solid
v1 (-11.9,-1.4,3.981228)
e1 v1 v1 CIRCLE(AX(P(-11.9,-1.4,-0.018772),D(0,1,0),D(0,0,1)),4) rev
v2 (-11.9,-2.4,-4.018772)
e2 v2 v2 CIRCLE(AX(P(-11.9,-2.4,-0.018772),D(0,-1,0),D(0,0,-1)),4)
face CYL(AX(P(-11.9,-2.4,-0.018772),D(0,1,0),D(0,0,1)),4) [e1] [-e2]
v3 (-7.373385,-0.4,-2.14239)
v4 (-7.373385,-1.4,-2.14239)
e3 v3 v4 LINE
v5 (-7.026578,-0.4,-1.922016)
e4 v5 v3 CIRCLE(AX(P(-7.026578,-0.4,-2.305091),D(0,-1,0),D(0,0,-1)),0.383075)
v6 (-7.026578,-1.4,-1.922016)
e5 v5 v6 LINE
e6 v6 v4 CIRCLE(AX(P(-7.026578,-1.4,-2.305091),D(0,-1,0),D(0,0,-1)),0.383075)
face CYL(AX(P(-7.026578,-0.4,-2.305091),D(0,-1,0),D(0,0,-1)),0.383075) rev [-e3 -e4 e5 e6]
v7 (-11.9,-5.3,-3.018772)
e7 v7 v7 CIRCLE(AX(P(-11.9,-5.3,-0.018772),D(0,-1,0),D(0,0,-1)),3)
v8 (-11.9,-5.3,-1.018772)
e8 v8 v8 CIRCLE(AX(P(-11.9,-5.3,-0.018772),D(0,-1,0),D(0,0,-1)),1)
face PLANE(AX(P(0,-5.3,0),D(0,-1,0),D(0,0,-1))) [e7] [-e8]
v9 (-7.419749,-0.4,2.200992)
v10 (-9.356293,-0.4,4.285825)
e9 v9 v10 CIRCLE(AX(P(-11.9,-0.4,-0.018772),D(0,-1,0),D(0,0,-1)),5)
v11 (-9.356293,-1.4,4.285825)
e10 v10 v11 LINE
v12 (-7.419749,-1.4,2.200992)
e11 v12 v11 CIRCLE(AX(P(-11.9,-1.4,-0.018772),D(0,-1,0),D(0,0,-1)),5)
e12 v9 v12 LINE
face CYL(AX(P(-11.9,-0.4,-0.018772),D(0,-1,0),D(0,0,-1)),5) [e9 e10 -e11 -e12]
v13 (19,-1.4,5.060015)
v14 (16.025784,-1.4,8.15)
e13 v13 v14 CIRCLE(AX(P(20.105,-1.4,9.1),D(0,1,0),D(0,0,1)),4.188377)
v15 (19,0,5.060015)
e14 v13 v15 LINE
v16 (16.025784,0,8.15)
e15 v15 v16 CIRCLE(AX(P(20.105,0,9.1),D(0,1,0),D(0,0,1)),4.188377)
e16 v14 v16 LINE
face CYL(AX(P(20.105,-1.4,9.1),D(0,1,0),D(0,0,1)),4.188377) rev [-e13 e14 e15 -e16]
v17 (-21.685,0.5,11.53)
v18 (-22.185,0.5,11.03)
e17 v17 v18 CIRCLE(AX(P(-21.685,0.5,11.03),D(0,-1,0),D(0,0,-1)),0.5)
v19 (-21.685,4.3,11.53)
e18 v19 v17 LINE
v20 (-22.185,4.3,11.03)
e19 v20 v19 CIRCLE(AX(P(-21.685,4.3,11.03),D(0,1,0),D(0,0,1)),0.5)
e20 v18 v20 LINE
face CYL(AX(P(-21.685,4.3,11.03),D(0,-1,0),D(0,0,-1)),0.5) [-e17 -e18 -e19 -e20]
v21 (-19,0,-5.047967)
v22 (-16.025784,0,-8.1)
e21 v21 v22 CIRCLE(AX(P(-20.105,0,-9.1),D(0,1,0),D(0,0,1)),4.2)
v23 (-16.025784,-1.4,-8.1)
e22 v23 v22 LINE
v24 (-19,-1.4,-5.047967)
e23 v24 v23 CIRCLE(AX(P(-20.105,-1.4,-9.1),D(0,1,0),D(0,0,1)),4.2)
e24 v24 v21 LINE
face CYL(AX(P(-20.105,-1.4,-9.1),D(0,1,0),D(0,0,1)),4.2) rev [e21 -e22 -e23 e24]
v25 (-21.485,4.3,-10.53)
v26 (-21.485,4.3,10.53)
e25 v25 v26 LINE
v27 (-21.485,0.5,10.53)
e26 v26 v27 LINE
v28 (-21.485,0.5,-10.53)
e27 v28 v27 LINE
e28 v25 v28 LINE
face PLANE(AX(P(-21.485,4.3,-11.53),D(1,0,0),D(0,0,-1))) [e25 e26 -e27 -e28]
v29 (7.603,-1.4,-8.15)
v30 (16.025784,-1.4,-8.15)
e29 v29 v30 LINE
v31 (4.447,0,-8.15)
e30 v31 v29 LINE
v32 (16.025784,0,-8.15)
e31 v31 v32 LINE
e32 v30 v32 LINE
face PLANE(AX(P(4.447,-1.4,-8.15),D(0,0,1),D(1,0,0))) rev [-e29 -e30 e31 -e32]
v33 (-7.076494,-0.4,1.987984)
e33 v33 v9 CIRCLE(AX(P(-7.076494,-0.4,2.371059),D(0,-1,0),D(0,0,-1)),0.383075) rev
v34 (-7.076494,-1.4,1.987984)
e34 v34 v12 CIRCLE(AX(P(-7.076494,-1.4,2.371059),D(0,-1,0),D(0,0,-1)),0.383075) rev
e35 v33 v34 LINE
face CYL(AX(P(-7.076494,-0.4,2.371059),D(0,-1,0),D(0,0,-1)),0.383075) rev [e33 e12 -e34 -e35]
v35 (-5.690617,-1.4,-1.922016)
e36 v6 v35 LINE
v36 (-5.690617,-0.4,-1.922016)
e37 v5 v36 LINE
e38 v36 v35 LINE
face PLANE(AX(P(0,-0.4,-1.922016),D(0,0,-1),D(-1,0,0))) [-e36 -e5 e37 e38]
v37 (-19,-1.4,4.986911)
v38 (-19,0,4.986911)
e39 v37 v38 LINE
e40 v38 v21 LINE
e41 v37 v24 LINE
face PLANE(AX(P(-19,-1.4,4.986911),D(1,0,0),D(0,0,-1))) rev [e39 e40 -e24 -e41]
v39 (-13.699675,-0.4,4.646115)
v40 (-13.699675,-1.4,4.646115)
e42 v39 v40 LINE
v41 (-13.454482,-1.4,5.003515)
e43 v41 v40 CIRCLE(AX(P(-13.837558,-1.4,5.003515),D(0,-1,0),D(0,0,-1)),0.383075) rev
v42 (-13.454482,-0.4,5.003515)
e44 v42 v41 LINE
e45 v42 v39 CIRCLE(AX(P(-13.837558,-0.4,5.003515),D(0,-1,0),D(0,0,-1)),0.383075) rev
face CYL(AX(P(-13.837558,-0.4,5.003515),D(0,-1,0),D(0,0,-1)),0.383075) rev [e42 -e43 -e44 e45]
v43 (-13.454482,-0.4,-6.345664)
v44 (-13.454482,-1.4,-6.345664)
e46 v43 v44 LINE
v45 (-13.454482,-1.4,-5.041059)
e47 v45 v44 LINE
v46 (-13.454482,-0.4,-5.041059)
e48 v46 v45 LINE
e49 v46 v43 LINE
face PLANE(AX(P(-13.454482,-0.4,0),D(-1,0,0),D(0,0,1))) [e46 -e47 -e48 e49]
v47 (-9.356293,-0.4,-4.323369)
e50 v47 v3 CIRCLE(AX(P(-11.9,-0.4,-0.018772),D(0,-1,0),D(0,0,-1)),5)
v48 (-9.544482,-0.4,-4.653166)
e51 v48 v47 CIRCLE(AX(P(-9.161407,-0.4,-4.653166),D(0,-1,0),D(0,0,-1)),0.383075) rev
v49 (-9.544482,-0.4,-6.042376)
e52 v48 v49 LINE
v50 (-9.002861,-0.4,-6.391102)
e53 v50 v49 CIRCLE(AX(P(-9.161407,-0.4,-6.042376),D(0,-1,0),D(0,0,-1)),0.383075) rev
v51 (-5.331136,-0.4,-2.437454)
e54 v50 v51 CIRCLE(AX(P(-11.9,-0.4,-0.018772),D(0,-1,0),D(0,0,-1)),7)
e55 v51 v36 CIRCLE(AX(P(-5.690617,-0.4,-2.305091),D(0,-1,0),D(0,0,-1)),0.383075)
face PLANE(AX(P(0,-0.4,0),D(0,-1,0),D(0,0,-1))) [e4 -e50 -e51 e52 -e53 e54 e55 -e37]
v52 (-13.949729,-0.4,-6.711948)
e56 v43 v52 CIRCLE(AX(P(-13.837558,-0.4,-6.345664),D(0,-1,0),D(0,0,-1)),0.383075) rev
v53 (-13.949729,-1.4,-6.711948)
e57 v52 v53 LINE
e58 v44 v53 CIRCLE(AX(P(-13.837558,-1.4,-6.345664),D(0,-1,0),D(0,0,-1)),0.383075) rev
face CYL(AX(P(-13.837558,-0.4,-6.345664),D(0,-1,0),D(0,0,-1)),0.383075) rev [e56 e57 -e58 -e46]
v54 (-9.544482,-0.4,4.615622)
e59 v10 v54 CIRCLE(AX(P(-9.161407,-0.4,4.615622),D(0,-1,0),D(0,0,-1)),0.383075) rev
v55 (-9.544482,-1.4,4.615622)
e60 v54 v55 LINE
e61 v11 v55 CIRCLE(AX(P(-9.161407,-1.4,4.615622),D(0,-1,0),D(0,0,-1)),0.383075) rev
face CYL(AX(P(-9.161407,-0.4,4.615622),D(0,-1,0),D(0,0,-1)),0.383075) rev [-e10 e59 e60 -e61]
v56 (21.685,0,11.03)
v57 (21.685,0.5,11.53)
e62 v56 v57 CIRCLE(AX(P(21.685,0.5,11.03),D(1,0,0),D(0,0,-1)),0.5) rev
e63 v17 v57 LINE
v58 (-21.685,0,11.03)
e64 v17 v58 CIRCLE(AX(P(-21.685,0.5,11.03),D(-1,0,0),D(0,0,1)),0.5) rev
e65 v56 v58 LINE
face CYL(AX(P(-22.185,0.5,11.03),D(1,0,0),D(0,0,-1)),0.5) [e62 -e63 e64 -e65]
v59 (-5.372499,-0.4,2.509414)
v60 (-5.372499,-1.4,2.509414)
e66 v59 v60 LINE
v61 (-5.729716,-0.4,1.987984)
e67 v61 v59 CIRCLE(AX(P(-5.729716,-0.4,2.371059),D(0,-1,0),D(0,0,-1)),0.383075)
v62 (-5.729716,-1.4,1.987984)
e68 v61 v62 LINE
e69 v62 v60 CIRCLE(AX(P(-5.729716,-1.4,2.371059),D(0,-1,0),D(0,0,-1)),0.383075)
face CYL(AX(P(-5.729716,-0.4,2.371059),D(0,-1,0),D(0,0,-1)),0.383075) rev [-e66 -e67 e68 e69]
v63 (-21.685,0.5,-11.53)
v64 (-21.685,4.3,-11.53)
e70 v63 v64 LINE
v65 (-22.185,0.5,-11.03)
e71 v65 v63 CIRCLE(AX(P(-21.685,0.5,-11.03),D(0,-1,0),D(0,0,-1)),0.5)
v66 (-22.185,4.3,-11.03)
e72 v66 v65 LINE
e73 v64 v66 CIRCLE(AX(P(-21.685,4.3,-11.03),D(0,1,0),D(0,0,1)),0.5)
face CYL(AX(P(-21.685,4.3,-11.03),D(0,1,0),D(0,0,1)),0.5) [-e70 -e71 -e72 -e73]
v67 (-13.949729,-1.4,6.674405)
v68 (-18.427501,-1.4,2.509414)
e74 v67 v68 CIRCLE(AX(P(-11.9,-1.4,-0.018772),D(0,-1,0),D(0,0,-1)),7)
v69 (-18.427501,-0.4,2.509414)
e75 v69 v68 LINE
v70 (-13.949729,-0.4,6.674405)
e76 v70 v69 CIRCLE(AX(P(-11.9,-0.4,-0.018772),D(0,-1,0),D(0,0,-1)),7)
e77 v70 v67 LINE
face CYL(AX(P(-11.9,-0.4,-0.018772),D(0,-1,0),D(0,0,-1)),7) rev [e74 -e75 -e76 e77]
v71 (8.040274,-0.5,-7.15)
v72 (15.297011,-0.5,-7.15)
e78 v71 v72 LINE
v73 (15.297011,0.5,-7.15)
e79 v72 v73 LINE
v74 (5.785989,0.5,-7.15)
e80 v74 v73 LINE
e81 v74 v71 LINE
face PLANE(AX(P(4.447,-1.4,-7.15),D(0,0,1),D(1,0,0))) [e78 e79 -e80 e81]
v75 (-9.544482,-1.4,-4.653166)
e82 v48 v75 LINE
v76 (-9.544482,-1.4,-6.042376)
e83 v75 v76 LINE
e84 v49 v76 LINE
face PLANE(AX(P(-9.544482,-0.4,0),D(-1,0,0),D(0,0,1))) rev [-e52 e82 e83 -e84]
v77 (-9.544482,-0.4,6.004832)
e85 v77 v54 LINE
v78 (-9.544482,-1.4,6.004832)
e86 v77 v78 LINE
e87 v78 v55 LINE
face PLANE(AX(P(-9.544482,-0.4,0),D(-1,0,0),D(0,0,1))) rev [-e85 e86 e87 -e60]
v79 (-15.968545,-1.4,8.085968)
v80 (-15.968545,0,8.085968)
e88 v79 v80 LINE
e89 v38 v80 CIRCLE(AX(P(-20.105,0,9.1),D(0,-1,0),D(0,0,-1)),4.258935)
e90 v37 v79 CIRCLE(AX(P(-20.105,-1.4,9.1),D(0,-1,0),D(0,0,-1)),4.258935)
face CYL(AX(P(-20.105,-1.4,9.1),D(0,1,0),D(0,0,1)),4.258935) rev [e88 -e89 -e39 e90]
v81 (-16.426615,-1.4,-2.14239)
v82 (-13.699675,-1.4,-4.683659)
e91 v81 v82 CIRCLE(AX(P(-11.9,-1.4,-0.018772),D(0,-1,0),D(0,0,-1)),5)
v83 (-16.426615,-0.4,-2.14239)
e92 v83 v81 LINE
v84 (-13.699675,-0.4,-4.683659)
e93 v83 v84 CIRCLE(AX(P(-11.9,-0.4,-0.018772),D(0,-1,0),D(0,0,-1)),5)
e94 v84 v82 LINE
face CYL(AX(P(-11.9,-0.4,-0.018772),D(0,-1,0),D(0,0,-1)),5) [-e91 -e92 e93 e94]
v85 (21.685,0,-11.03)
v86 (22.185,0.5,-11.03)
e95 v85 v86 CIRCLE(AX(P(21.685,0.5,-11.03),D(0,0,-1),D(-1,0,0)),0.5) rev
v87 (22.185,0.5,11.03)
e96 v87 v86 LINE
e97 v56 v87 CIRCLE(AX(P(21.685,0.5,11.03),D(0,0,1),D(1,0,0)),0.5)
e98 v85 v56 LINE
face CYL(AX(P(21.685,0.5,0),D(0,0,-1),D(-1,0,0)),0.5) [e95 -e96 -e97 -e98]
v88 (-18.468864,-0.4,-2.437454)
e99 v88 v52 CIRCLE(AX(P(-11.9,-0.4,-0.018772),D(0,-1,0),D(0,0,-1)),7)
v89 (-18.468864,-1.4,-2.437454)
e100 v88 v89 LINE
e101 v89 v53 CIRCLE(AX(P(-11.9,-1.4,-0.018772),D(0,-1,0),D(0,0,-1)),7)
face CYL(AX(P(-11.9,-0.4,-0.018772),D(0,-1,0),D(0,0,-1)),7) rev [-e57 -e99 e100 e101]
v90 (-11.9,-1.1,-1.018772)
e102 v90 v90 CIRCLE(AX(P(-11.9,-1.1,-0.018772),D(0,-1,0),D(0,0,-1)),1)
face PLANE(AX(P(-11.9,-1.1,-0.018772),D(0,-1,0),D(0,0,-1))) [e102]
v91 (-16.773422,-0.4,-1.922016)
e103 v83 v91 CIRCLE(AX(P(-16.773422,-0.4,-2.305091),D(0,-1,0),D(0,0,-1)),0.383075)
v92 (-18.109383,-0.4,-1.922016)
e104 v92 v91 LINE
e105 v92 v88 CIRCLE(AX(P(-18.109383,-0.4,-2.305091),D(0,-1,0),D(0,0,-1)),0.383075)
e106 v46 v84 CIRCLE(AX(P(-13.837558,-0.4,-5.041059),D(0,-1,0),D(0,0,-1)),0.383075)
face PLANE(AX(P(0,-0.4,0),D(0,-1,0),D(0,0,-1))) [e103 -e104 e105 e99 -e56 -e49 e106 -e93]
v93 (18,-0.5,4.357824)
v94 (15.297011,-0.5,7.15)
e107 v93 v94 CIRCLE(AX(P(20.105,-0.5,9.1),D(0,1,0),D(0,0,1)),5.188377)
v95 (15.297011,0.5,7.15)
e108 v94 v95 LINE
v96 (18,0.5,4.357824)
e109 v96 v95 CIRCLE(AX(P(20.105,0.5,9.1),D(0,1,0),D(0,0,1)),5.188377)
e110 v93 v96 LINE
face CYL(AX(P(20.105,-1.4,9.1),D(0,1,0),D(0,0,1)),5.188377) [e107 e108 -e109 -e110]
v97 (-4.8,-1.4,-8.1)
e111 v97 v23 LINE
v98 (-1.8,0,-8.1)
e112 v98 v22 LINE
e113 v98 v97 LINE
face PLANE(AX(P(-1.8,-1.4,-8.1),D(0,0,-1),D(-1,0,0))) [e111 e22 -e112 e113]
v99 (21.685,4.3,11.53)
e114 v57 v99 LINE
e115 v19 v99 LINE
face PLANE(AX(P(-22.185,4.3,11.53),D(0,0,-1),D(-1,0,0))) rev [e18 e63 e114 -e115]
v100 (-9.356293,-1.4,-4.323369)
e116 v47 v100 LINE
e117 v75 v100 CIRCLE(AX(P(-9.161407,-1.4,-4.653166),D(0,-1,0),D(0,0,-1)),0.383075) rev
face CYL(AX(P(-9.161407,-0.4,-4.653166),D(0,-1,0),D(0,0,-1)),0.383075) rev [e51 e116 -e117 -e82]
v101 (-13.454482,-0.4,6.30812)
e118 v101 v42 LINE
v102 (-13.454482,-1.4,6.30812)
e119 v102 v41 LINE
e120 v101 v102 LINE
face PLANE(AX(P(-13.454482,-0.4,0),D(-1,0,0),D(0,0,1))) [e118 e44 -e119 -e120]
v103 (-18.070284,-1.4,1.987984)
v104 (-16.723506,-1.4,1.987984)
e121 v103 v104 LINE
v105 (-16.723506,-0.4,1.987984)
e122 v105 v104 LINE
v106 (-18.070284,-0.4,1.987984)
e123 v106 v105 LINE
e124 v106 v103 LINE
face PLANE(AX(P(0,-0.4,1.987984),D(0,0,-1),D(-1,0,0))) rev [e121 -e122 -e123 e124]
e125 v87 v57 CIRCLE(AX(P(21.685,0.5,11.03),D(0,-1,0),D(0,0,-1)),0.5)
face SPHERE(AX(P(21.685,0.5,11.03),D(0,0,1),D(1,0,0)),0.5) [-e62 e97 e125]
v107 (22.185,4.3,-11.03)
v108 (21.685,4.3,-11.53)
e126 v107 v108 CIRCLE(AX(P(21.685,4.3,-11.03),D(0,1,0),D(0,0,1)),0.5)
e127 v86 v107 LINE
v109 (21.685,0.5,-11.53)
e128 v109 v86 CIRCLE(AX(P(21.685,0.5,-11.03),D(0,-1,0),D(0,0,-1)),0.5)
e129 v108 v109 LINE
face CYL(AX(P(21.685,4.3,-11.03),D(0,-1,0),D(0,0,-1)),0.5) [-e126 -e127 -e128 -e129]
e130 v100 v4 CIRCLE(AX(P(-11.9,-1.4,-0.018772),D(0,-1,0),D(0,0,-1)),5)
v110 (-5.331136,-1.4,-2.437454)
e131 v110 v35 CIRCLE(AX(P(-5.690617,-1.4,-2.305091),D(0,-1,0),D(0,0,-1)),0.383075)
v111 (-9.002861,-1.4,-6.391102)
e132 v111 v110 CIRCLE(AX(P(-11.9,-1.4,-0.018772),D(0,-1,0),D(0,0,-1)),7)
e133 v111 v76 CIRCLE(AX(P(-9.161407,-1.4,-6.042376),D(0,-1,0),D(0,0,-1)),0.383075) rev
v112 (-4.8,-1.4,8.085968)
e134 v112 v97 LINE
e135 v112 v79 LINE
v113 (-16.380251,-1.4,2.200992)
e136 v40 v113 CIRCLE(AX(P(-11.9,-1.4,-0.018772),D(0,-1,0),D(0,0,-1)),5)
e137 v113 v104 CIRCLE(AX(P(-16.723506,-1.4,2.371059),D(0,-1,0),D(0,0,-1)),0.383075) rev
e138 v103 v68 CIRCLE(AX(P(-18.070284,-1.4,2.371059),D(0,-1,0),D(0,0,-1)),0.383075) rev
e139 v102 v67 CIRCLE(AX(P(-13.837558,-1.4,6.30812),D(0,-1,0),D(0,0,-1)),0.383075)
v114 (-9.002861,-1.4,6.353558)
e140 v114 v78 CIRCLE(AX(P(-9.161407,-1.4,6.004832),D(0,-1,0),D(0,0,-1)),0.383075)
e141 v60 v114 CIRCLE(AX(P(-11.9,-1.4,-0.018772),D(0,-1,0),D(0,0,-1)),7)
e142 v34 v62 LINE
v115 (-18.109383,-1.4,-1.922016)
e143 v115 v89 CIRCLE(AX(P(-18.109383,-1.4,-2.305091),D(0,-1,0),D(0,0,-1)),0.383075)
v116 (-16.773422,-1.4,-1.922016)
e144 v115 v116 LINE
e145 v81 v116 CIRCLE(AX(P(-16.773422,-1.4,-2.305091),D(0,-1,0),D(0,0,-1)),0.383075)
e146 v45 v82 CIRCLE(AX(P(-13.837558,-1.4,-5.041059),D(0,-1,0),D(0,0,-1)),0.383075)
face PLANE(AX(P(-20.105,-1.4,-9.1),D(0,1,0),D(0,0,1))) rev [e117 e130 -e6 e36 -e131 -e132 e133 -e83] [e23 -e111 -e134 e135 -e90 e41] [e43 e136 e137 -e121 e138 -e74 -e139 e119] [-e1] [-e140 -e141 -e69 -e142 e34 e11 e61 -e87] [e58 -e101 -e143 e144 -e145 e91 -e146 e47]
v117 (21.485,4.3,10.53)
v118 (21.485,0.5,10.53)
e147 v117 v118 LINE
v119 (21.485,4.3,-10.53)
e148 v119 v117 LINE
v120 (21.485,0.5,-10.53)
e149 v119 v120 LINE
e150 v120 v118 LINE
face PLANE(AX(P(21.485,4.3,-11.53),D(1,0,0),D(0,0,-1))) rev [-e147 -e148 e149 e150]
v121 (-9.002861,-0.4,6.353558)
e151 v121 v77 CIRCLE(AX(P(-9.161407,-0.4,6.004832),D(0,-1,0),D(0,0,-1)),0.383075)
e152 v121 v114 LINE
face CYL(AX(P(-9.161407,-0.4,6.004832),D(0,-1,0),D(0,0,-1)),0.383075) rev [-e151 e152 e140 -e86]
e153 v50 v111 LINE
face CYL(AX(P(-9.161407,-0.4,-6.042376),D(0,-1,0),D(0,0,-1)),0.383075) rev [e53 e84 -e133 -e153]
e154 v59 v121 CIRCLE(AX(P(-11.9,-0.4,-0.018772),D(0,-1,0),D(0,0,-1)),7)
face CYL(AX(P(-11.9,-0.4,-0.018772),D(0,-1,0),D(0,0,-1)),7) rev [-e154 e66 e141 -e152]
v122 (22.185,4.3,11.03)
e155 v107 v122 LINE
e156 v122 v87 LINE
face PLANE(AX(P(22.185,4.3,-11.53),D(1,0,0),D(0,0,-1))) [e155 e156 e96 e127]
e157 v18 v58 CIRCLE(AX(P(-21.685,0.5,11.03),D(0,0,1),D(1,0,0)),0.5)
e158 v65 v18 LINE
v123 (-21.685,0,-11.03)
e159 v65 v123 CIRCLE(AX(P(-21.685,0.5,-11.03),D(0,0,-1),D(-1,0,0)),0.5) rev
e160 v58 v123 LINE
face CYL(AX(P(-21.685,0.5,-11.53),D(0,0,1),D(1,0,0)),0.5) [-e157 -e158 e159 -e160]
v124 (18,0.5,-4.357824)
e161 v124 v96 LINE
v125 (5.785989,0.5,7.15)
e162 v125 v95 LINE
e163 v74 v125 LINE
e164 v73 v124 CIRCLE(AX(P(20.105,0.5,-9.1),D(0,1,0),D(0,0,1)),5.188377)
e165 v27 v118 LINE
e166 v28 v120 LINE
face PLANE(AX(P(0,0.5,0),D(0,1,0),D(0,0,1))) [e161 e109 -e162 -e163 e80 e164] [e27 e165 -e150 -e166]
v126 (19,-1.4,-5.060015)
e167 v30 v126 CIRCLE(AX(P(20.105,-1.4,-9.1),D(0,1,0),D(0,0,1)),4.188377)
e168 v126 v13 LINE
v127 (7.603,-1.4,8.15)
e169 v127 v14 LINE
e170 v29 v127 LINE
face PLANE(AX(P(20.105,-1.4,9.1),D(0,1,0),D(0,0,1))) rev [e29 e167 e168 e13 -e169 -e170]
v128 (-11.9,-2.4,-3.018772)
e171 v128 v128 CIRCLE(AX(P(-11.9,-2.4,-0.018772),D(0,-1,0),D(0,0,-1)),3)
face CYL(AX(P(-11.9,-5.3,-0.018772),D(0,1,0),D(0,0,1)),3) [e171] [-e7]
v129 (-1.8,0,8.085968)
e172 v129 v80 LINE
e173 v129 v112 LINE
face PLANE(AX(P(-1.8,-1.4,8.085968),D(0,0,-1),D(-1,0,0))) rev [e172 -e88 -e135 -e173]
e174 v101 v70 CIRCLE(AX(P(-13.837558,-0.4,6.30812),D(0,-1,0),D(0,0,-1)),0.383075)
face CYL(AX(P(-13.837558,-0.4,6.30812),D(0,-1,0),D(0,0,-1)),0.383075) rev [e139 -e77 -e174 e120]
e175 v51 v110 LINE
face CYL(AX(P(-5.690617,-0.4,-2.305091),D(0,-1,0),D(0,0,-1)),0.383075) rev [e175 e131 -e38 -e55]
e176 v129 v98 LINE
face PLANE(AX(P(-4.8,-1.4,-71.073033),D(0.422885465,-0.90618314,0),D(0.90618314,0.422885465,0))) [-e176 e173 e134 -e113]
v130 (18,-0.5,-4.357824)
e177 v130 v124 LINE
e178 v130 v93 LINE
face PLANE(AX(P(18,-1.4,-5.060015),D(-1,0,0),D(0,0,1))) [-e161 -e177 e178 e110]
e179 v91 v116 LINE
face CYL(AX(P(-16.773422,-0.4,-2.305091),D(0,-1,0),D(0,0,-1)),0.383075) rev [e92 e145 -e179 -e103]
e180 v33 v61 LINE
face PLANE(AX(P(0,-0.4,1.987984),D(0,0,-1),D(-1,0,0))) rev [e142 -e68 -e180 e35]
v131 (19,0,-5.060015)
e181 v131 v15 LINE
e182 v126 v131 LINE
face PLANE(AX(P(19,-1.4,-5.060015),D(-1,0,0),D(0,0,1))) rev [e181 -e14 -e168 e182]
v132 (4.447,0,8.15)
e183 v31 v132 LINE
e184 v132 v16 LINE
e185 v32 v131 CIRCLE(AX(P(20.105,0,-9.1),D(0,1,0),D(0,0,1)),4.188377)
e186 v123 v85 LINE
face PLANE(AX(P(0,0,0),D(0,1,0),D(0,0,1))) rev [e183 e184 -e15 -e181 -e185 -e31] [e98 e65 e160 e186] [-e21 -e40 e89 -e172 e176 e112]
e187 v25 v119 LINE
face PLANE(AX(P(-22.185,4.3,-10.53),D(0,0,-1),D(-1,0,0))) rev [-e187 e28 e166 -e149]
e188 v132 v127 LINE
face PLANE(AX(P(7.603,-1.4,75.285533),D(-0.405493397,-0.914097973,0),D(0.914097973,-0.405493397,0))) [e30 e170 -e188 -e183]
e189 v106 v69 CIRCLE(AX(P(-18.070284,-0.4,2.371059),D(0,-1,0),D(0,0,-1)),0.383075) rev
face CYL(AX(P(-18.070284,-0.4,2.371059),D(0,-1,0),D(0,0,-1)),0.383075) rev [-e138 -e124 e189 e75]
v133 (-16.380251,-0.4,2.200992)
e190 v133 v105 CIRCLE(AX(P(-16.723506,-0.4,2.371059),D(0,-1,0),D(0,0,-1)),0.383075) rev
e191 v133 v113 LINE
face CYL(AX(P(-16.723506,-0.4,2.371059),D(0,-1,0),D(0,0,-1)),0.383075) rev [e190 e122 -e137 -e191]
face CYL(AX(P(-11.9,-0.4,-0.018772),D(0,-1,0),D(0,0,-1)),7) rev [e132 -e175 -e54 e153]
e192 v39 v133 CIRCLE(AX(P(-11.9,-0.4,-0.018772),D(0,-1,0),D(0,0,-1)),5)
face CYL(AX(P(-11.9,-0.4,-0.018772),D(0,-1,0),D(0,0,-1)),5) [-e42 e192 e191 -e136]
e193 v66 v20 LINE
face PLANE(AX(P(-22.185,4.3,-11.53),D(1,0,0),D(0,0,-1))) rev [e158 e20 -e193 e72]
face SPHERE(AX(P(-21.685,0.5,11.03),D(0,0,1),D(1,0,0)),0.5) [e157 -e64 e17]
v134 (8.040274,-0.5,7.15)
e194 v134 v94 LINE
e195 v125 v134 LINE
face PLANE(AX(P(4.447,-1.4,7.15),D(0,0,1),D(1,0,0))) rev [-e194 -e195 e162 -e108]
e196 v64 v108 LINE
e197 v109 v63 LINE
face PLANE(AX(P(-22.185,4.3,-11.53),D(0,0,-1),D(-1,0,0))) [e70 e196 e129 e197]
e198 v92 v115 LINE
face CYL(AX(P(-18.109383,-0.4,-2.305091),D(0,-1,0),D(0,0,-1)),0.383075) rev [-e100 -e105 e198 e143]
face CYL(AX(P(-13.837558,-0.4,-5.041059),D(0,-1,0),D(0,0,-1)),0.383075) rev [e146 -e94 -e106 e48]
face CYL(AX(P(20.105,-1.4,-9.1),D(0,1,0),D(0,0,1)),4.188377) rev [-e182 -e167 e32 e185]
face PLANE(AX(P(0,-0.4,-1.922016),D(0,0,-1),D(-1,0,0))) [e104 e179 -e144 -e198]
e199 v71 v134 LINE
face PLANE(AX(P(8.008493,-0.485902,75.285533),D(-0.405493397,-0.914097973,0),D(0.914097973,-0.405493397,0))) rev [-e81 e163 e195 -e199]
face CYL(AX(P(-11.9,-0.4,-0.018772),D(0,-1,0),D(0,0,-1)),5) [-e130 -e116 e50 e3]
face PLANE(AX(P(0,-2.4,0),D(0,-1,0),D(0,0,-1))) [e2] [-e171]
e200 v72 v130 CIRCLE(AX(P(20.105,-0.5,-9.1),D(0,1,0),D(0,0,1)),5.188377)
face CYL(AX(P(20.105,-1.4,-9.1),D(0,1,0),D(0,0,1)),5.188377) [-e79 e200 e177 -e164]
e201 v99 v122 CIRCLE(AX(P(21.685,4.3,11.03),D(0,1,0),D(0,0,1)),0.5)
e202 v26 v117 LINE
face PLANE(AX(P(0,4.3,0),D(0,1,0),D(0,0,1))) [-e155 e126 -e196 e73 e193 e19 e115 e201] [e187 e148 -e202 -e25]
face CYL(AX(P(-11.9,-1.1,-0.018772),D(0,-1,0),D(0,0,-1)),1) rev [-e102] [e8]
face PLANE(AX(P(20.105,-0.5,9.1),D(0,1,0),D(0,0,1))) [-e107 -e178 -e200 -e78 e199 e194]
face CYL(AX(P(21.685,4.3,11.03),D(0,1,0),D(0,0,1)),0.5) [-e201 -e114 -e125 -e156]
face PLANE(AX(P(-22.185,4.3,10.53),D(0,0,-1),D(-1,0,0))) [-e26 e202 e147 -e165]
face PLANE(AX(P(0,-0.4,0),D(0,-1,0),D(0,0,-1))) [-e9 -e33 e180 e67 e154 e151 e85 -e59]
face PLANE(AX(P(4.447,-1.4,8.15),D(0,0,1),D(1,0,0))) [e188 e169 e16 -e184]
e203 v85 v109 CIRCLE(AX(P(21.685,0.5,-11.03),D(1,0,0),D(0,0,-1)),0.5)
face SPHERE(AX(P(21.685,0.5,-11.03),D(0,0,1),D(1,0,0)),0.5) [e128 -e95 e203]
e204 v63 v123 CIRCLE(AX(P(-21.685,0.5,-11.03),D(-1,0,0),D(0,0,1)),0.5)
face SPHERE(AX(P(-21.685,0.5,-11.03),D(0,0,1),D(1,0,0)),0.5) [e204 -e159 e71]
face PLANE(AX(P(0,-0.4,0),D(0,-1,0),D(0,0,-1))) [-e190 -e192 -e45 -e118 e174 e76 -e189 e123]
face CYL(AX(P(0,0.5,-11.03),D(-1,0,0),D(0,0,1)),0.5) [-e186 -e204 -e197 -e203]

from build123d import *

# Parameters (mm, degrees)
BOTTOM_COVER_SKETCH_01_W                   = 44.37
BOTTOM_COVER_SKETCH_01_H                   = 23.06
BOTTOM_COVER_EXT_SHAPE_DEPTH               = 4.3
SALIENTE_EXTRUIR1_DEPTH                    = 1.4
CORTAR_EXTRUIR1_DEPTH                      = 30.966091253
CORTAR_EXTRUIR1_DEPTH_BACK                 = 30.966091253
VACIADO2_START                             = 0.5
VACIADO2_OUTLINE_W                         = 42.97
VACIADO2_OUTLINE_H                         = 21.06
VACIADO2_DEPTH                             = 3.8
SALIENTE_EXTRUIR2_DEPTH                    = 1.4
CORTAR_EXTRUIR2_DEPTH                      = 30.933277886
CORTAR_EXTRUIR2_DEPTH_BACK                 = 30.933277886
BOTTOM_POWER_TAKE_OFF_SHAFT_SKETCH_R       = 3
POWER_TAKE_OFF_SHAFT_EXTRUDE_01_DEPTH      = 3.9
BOTTOM_POWER_TAKE_OFF_SHAFT_SKETCH_3_R     = 4
BOTTOM_POWER_TAKE_OFF_SHAFT_SKETCH_3_R_2   = 3
POWER_TAKE_OFF_SHAFT_EXTRUDE_02_DEPTH      = 1
POWER_TAKE_OFF_SHAFT_CUT_DEPTH             = 1
POWER_TAKE_OFF_SHAFT_BOTTOM_COVER_SKETCH_R = 1
CORTAR_EXTRUIR4_DEPTH                      = 4.2
REDONDEO1_R                                = 0.5


with BuildPart() as part:
    # bottom-cover-sketch-01 → Bottom-cover-ext-shape (new body)
    with BuildSketch(Plane(origin=(0, 0, 0), x_dir=(1, 0, 0), z_dir=(0, 1, 0))):
        Rectangle(BOTTOM_COVER_SKETCH_01_W, BOTTOM_COVER_SKETCH_01_H)
    extrude(amount=BOTTOM_COVER_EXT_SHAPE_DEPTH)

    # bottom-cover-sketch-01<31> → Saliente-Extruir1 (add)
    with BuildSketch(Plane(origin=(0, 0, 0), x_dir=(1, 0, 0), z_dir=(0, 1, 0))):
        with BuildLine():
            Line((4.447, 8.15), (16.025784389, 8.15))
            ThreePointArc((16.025784389, 8.15), (17.087381076, 6.195438755), (19, 5.06001547))
            Line((19, 5.06001547), (19, -5.06001547))
            ThreePointArc((19, -5.06001547), (17.087381076, -6.195438755), (16.025784389, -8.15))
            Line((16.025784389, -8.15), (4.447, -8.15))
            Line((4.447, -8.15), (4.447, 8.15))
        make_face()
    extrude(amount=-SALIENTE_EXTRUIR1_DEPTH)

    # Croquis3 → Cortar-Extruir1 (cut, two sides: drawn at the far end of the back side and taken through both)
    with BuildSketch(Plane.XY.offset(8.15).offset(-CORTAR_EXTRUIR1_DEPTH_BACK)):
        Polygon((4.447, -1.4), (7.603, -1.4), (4.447, 0), align=None)
    extrude(amount=CORTAR_EXTRUIR1_DEPTH + CORTAR_EXTRUIR1_DEPTH_BACK, mode=Mode.SUBTRACT)

    # Vaciado2: read off the stored shape, not the designer's step
    # Vaciado2 outline → Vaciado2 (cut)
    with BuildSketch(Plane(origin=(0, 0, 0), x_dir=(1, 0, 0), z_dir=(0, 1, 0)).offset(VACIADO2_START)):
        Rectangle(VACIADO2_OUTLINE_W, VACIADO2_OUTLINE_H)
    extrude(amount=VACIADO2_DEPTH, mode=Mode.SUBTRACT)

    # Vaciado2 2: loft between two sections, ruled curve by curve
    vaciado2_2_from = [
        Edge.make_three_point_arc((15.297011486, -0.5, -7.15), (16.377210633, -0.5, -5.491282779), (18, -0.5, -4.357824492)),
        Edge.make_three_point_arc((18, -0.5, 4.357824492), (16.377210633, -0.5, 5.491282779), (15.297011486, -0.5, 7.15)),
        Edge.make_line((8.040274257, -0.5, -7.15), (15.297011486, -0.5, -7.15)),
        Edge.make_line((15.297011486, -0.5, 7.15), (8.040274257, -0.5, 7.15)),
        Edge.make_line((18, -0.5, -4.357824492), (18, -0.5, 4.357824492)),
        Edge.make_line((8.040274257, -0.5, 7.15), (8.040274257, -0.5, -7.15)),
    ]
    vaciado2_2_to = [
        Edge.make_three_point_arc((15.297011486, 0.5, -7.15), (16.377210633, 0.5, -5.491282779), (18, 0.5, -4.357824492)),
        Edge.make_three_point_arc((18, 0.5, 4.357824492), (16.377210633, 0.5, 5.491282779), (15.297011486, 0.5, 7.15)),
        Edge.make_line((5.785988543, 0.5, -7.15), (15.297011486, 0.5, -7.15)),
        Edge.make_line((15.297011486, 0.5, 7.15), (5.785988543, 0.5, 7.15)),
        Edge.make_line((18, 0.5, -4.357824492), (18, 0.5, 4.357824492)),
        Edge.make_line((5.785988543, 0.5, 7.15), (5.785988543, 0.5, -7.15)),
    ]
    vaciado2_2 = Solid(Shell([*[Face.make_surface_from_curves(vaciado2_2_from[k], vaciado2_2_to[k]) for k in range(6)], Face(Wire(vaciado2_2_from)), Face(Wire(vaciado2_2_to))]))
    add(vaciado2_2, mode=Mode.SUBTRACT)

    # bottom-cover-sketch-01<32> → Saliente-Extruir2 (add)
    with BuildSketch(Plane(origin=(0, 0, 0), x_dir=(1, 0, 0), z_dir=(0, 1, 0))):
        with BuildLine():
            Line((-1.8, -8.085967922), (-15.968544519, -8.085967922))
            ThreePointArc((-15.968544519, -8.085967922), (-17.060455349, -6.121867553), (-19, -4.986911136))
            Line((-19, -4.986911136), (-19, 5.04796656))
            ThreePointArc((-19, 5.04796656), (-17.09705221, 6.168745986), (-16.025784389, 8.1))
            Line((-16.025784389, 8.1), (-1.8, 8.1))
            Line((-1.8, 8.1), (-1.8, -8.085967922))
        make_face()
    extrude(amount=-SALIENTE_EXTRUIR2_DEPTH)

    # Croquis4 → Cortar-Extruir2 (cut, two sides: drawn at the far end of the back side and taken through both)
    with BuildSketch(Plane(origin=(0, 0, -8.1), x_dir=(-1, 0, 0), z_dir=(0, 0, -1)).offset(-CORTAR_EXTRUIR2_DEPTH_BACK)):
        Polygon((1.8, -1.4), (4.8, -1.4), (1.8, 0), align=None)
    extrude(amount=CORTAR_EXTRUIR2_DEPTH + CORTAR_EXTRUIR2_DEPTH_BACK, mode=Mode.SUBTRACT)

    # Bottom-power-take-off-shaft-sketch → Power-take-off-shaft-extrude-01 (add)
    with BuildSketch(Plane.XZ.offset(1.4)):
        with Locations(Location((-11.9, -0.018771875, 0), (0, 0, 270))):
            Circle(BOTTOM_POWER_TAKE_OFF_SHAFT_SKETCH_R)
    extrude(amount=POWER_TAKE_OFF_SHAFT_EXTRUDE_01_DEPTH)

    # Bottom-power-take-off-shaft-sketch<3> → Power-take-off-shaft-extrude-02 (add)
    with BuildSketch(Plane.XZ.offset(1.4)):
        with Locations(Location((-11.9, -0.018771875, 0), (0, 0, 90))):
            Circle(BOTTOM_POWER_TAKE_OFF_SHAFT_SKETCH_3_R)
        with Locations(Location((-11.9, -0.018771875, 0), (0, 0, 270))):
            Circle(BOTTOM_POWER_TAKE_OFF_SHAFT_SKETCH_3_R_2, mode=Mode.SUBTRACT)
    extrude(amount=POWER_TAKE_OFF_SHAFT_EXTRUDE_02_DEPTH)

    # Bottom-power-take-off-shaft-sketch<4> → Power-take-off-shaft-cut (cut)
    with BuildSketch(Plane.XZ.offset(1.4)):
        with BuildLine():
            Line((-13.454482392, -5.041059169), (-13.454482392, -6.345663941))
            ThreePointArc((-13.454482392, -6.345663941), (-13.609767702, -6.653654843), (-13.949729169, -6.711948276))
            ThreePointArc((-13.949729169, -6.711948276), (-16.710183373, -5.104254736), (-18.468864278, -2.437453767))
            ThreePointArc((-18.468864278, -2.437453767), (-18.423589426, -2.085954505), (-18.109382928, -1.922016039))
            Line((-18.109382928, -1.922016039), (-16.773422083, -1.922016039))
            ThreePointArc((-16.773422083, -1.922016039), (-16.567971503, -1.981769919), (-16.426615215, -2.142390177))
            ThreePointArc((-16.426615215, -2.142390177), (-15.30881206, -3.676640153), (-13.699675431, -4.68365862))
            ThreePointArc((-13.699675431, -4.68365862), (-13.521673241, -4.824348083), (-13.454482392, -5.041059169))
        make_face()
        with BuildLine():
            ThreePointArc((-18.070283639, 1.987983961), (-18.386311386, 2.15455721), (-18.427501404, 2.509414316))
            ThreePointArc((-18.427501404, 2.509414316), (-16.667494828, 5.106751812), (-13.949729169, 6.674404526))
            ThreePointArc((-13.949729169, 6.674404526), (-13.609767702, 6.616111093), (-13.454482392, 6.30812019))
            Line((-13.454482392, 6.30812019), (-13.454482392, 5.003515418))
            ThreePointArc((-13.454482392, 5.003515418), (-13.521673241, 4.786804333), (-13.699675431, 4.64611487))
            ThreePointArc((-13.699675431, 4.64611487), (-15.269573485, 3.675273946), (-16.380250969, 2.200991908))
            ThreePointArc((-16.380250969, 2.200991908), (-16.52151792, 2.045563265), (-16.723505638, 1.987983961))
            Line((-16.723505638, 1.987983961), (-18.070283639, 1.987983961))
        make_face()
        with BuildLine():
            ThreePointArc((-5.372498596, 2.509414316), (-6.810764187, 4.78744065), (-9.002861085, 6.353557848))
            ThreePointArc((-9.002861085, 6.353557848), (-9.368785516, 6.326920146), (-9.544482392, 6.00483186))
            Line((-9.544482392, 6.00483186), (-9.544482392, 4.615622196))
            ThreePointArc((-9.544482392, 4.615622196), (-9.494125288, 4.425766238), (-9.356293346, 4.285825255))
            ThreePointArc((-9.356293346, 4.285825255), (-8.236582512, 3.384075801), (-7.419749031, 2.200991908))
            ThreePointArc((-7.419749031, 2.200991908), (-7.27848208, 2.045563265), (-7.076494362, 1.987983961))
            Line((-7.076494362, 1.987983961), (-5.729716361, 1.987983961))
            ThreePointArc((-5.729716361, 1.987983961), (-5.413688614, 2.15455721), (-5.372498596, 2.509414316))
        make_face()
        with BuildLine():
            Line((-7.026577917, -1.922016039), (-5.690617072, -1.922016039))
            ThreePointArc((-5.690617072, -1.922016039), (-5.376410574, -2.085954505), (-5.331135722, -2.437453767))
            ThreePointArc((-5.331135722, -2.437453767), (-6.770756692, -4.782264616), (-9.002861085, -6.391101599))
            ThreePointArc((-9.002861085, -6.391101599), (-9.368785516, -6.364463896), (-9.544482392, -6.04237561))
            Line((-9.544482392, -6.04237561), (-9.544482392, -4.653165946))
            ThreePointArc((-9.544482392, -4.653165946), (-9.494125288, -4.463309988), (-9.356293346, -4.323369006))
            ThreePointArc((-9.356293346, -4.323369006), (-8.200468949, -3.382322083), (-7.373384785, -2.142390177))
            ThreePointArc((-7.373384785, -2.142390177), (-7.232028497, -1.981769919), (-7.026577917, -1.922016039))
        make_face()
    extrude(amount=-POWER_TAKE_OFF_SHAFT_CUT_DEPTH, mode=Mode.SUBTRACT)

    # Power-take-off-shaft-bottom-cover-sketch → Cortar-Extruir4 (cut)
    with BuildSketch(Plane.XZ.offset(5.3)):
        with Locations(Location((-11.9, -0.018771875, 0), (0, 0, 270))):
            Circle(POWER_TAKE_OFF_SHAFT_BOTTOM_COVER_SKETCH_R)
    extrude(amount=-CORTAR_EXTRUIR4_DEPTH, mode=Mode.SUBTRACT)

    # Redondeo1
    redondeo1_edges = [part.edges().sort_by_distance(p)[0] for p in [
        (0, 0, -11.53),
        (22.185, 0, 0),
        (0, 0, 11.53),
        (-22.185, 0, 0),
        (-22.185, 2.15, -11.53),
        (22.185, 2.15, -11.53),
        (22.185, 2.15, 11.53),
        (-22.185, 2.15, 11.53),
    ]]
    fillet(redondeo1_edges, radius=REDONDEO1_R)


solid = part.part
